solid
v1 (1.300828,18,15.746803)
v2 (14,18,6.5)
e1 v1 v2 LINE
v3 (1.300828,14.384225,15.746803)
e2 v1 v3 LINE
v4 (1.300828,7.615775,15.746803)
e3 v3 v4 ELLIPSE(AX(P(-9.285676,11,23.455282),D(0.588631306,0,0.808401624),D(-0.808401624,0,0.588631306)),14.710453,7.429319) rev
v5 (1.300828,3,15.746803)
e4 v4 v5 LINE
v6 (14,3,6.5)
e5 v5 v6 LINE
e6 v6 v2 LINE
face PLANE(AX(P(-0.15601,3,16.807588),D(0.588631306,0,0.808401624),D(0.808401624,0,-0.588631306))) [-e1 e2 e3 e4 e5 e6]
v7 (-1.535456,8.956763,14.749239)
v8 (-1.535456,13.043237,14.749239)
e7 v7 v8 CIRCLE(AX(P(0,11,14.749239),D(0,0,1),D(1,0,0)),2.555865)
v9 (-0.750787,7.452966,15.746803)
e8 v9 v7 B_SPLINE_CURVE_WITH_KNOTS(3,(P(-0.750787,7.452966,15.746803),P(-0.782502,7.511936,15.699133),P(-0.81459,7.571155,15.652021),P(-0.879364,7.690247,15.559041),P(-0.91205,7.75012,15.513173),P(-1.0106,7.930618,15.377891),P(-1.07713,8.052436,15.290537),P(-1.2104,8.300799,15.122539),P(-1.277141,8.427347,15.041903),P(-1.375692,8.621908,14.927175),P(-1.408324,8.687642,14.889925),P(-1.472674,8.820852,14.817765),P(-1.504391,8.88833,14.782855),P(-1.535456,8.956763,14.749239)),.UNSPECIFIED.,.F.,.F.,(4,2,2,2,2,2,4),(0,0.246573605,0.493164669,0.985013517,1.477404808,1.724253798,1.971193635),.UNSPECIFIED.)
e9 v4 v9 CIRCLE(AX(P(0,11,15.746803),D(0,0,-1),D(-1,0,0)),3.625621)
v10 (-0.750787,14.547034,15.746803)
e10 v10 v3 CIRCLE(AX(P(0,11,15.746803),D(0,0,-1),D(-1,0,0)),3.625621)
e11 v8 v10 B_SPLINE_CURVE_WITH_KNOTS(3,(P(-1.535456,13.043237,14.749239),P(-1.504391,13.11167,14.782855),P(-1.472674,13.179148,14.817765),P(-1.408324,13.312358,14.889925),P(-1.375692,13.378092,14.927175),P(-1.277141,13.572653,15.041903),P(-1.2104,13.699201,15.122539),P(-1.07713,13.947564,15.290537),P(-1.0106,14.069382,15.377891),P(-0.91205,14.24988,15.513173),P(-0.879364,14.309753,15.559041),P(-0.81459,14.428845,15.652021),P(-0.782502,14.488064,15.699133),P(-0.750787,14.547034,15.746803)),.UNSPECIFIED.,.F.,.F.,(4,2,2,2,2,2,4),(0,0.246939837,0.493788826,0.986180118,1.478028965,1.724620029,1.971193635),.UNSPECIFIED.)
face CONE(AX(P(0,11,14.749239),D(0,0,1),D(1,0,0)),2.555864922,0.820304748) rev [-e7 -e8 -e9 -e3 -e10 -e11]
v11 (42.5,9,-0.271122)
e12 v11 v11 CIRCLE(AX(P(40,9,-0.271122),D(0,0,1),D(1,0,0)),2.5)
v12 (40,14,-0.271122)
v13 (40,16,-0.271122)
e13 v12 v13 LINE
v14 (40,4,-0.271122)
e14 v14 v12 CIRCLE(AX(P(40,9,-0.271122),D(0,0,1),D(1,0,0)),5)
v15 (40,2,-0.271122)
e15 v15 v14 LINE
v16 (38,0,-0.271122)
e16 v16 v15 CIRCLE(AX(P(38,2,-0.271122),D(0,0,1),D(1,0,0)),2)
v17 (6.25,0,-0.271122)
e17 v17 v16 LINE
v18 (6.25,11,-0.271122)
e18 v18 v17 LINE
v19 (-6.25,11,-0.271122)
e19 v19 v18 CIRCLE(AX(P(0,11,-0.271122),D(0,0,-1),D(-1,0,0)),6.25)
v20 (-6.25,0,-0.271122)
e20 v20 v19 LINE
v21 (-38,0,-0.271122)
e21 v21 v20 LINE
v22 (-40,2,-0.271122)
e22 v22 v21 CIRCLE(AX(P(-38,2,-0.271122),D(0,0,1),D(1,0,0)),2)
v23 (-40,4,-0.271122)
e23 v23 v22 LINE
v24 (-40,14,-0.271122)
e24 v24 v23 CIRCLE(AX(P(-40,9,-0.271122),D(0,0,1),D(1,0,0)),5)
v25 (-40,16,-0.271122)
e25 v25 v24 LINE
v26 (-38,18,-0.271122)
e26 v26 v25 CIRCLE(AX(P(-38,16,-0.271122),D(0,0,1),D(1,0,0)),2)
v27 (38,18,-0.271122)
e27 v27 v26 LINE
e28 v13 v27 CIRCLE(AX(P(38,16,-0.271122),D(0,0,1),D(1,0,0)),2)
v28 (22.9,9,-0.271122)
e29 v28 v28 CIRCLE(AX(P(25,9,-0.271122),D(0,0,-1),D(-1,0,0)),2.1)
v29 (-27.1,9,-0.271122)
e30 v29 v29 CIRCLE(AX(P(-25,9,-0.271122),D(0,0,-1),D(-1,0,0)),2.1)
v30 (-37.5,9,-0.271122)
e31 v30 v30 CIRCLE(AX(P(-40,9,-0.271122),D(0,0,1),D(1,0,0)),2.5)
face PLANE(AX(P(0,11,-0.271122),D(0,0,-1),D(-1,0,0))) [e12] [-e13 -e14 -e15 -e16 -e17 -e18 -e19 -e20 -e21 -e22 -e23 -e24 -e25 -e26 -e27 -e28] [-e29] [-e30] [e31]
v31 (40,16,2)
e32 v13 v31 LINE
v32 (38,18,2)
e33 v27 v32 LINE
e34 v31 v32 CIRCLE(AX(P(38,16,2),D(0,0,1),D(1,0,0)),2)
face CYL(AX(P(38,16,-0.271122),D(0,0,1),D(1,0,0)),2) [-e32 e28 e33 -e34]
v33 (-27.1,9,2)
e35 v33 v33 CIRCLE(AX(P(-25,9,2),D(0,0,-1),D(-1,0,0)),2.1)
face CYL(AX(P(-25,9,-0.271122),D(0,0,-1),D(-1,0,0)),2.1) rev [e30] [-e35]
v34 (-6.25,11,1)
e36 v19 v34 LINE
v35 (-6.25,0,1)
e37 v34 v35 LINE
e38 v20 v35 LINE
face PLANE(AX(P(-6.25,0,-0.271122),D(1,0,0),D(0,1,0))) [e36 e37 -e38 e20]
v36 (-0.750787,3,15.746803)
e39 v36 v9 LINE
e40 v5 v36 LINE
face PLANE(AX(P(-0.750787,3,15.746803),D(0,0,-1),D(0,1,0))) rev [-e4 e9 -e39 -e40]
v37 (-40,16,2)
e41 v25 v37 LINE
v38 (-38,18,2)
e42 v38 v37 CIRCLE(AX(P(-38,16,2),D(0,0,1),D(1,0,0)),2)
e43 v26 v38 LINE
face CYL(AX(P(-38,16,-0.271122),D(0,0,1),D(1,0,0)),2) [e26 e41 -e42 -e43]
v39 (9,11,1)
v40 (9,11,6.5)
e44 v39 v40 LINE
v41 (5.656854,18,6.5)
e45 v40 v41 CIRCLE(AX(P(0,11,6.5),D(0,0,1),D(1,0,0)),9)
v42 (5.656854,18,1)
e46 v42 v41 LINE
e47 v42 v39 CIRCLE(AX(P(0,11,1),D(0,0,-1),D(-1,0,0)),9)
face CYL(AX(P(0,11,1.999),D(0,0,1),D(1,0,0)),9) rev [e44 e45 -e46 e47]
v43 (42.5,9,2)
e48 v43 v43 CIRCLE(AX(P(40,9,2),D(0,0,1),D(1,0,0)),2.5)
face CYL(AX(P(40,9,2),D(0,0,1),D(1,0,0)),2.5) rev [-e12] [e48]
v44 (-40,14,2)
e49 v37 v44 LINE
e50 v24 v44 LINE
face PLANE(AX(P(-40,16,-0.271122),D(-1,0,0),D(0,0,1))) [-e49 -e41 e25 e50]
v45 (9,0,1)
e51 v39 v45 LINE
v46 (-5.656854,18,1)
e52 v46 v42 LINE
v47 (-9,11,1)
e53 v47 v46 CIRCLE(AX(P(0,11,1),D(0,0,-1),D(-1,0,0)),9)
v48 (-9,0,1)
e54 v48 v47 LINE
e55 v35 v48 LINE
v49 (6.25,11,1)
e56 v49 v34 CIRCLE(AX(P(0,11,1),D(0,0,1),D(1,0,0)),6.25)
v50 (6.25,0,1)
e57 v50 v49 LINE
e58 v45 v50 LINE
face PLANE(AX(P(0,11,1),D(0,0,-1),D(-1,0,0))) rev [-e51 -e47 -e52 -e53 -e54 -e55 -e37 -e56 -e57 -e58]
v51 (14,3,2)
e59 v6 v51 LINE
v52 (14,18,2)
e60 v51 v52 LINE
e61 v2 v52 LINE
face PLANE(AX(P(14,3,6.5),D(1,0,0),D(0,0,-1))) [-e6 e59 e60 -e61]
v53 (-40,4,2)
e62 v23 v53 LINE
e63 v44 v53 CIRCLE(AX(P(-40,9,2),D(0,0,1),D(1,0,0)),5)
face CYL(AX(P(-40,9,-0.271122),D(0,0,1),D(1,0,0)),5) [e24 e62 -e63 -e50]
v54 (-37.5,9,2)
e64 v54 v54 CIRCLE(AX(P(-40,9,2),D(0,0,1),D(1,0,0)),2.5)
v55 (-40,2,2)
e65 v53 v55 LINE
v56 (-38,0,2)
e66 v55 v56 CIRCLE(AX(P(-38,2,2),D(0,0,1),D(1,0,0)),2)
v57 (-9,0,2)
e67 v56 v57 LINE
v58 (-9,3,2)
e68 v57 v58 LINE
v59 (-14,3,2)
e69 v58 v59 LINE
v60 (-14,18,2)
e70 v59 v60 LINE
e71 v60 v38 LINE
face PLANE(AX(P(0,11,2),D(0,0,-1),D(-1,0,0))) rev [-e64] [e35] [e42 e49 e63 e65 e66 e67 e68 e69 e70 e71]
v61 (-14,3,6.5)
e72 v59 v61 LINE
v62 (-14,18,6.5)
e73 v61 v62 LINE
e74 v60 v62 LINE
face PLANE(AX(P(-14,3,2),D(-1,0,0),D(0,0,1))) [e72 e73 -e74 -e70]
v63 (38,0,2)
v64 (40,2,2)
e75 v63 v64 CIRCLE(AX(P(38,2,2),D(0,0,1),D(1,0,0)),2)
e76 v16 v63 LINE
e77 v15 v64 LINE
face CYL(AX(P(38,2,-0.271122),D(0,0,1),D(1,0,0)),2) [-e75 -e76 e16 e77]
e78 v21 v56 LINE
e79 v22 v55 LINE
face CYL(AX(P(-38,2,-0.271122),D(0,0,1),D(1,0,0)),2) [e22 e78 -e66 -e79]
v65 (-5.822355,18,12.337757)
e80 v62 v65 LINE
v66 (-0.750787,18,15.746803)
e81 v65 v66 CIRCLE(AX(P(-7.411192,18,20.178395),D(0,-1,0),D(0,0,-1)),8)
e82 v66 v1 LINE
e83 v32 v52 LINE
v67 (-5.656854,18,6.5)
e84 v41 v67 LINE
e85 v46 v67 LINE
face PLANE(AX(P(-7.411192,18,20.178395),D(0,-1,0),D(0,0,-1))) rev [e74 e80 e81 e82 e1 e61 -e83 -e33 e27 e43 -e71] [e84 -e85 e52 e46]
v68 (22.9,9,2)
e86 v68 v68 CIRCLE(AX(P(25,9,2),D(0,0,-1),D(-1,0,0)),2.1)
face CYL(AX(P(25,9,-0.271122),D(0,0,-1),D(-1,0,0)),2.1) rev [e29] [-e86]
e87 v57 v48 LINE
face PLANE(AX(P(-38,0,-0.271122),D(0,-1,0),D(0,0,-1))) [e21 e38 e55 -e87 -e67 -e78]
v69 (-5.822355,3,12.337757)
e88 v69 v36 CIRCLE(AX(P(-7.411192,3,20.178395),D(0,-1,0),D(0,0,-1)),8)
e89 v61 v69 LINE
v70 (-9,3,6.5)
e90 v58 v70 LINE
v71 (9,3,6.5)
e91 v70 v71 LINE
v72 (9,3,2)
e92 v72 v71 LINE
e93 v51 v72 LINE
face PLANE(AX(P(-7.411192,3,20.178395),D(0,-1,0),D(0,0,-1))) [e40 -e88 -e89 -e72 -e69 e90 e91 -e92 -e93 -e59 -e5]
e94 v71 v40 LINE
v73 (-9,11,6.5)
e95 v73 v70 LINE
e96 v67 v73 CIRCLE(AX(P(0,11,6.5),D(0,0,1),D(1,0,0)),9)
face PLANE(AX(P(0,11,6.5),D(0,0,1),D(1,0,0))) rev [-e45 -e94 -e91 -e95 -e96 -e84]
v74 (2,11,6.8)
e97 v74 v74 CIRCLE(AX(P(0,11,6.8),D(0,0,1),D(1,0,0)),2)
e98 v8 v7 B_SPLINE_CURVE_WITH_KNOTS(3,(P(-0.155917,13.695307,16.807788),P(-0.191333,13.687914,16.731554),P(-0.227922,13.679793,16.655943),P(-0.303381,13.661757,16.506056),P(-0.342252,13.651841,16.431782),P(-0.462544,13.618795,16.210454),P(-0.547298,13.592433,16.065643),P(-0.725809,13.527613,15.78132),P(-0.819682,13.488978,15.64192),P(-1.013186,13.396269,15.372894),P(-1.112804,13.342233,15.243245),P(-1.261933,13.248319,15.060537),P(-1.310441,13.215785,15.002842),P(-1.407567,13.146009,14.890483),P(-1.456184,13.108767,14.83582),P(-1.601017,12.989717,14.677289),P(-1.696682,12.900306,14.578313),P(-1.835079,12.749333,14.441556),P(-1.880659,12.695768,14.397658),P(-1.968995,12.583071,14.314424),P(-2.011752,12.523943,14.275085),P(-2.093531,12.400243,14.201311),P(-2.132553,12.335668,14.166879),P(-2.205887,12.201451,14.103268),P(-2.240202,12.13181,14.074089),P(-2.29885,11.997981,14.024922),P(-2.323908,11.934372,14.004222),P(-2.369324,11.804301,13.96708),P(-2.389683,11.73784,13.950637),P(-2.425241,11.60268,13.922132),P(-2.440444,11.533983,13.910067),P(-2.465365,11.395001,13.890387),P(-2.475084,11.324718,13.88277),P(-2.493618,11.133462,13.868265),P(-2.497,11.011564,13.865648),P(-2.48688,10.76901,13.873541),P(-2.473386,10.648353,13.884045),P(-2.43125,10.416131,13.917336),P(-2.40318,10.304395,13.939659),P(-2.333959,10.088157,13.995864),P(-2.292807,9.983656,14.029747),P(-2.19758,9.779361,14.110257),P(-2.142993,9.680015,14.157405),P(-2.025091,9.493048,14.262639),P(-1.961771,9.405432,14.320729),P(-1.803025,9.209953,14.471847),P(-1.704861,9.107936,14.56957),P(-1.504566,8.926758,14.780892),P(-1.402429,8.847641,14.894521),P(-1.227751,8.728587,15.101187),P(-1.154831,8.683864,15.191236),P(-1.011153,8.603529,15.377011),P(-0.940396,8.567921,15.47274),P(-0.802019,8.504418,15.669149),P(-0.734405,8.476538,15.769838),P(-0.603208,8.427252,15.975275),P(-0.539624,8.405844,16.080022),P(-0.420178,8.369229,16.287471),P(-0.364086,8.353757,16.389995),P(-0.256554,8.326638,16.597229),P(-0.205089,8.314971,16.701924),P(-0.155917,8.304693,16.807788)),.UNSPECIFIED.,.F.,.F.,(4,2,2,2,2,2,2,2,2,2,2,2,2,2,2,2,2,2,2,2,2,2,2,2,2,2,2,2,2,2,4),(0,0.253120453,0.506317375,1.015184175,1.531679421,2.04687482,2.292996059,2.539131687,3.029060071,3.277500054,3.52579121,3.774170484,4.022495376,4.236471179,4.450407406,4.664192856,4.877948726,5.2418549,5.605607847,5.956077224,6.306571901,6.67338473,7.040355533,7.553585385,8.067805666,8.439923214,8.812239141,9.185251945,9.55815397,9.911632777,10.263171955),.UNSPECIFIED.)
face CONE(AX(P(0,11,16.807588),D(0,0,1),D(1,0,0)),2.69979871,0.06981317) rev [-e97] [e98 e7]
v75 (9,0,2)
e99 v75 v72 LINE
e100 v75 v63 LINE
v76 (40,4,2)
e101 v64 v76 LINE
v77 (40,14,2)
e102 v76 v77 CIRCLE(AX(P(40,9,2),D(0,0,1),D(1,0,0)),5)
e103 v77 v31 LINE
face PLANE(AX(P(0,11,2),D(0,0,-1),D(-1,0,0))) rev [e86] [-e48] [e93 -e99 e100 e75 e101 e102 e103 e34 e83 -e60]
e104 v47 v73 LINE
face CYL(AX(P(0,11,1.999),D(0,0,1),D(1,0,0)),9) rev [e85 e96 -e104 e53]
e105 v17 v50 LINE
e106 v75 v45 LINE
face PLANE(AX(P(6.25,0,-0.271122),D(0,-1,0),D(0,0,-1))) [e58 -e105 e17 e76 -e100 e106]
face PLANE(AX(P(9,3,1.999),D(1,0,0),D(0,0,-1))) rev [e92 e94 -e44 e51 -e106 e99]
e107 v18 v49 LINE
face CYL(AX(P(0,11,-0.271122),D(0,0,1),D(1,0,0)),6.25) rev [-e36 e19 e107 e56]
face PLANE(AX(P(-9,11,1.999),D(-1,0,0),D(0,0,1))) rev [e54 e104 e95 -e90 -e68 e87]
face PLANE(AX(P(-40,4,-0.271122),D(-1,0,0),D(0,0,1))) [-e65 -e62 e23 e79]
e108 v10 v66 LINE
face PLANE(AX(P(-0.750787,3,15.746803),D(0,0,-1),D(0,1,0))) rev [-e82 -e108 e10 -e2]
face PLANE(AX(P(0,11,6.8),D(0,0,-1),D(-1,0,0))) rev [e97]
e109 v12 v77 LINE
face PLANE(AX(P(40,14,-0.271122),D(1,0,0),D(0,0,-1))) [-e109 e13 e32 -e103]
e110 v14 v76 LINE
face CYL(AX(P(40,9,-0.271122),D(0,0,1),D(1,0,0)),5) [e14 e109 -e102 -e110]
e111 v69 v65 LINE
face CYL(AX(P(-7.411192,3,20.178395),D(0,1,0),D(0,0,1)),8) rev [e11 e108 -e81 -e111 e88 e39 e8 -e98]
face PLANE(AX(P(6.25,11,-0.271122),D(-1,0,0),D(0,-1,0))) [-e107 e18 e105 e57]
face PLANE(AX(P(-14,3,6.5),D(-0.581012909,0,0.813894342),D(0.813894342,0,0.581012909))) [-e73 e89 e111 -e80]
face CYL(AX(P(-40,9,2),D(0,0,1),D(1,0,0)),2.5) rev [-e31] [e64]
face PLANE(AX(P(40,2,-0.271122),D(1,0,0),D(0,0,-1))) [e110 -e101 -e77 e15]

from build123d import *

# Parameters (mm, degrees)
BOSS_EXTRUDE1_DEPTH            = 15
CHAMFER1_SIZE                  = 1.802121321
CHAMFER2_SIZE                  = 1.802121321
CUT_EXTRUDE1_REACH             = 26.607
BOSS_EXTRUDE2_DEPTH            = 2.271122456
CUT_EXTRUDE2_REACH             = 52.66
F_4_2_4_2_DIAMETER_HOLE1_D     = 4.2
F_4_2_4_2_DIAMETER_HOLE1_DEPTH = 16.017925233
F_4_2_4_2_DIAMETER_HOLE2_D     = 4.2
F_4_2_4_2_DIAMETER_HOLE2_DEPTH = 16.017925233
F_5_0_5_DIAMETER_HOLE1_D       = 5
F_5_0_5_DIAMETER_HOLE2_D       = 5


with BuildPart() as part:
    # Sketch1 → Boss-Extrude1 (new body)
    with BuildSketch(Plane(origin=(0, 18, 0), x_dir=(1, 0, 0), z_dir=(0, 1, 0))):
        with BuildLine():
            Line((14, -6.5), (14, -2))
            Line((14, -2), (-14, -2))
            Line((-14, -2), (-14, -6.5))
            Line((-14, -6.5), (-5.822354851, -12.337757006))
            ThreePointArc((-5.822354851, -12.337757006), (-2.456495727, -13.897392525), (-0.156010119, -16.807587804))
            Line((-0.156010119, -16.807587804), (14, -6.5))
        make_face()
    extrude(amount=-BOSS_EXTRUDE1_DEPTH)

    # Sketch2 → Hole1 (revolve, cut)
    with BuildSketch(Plane(origin=(0, 11, 16.807587804), x_dir=(0, -1, 0), z_dir=(1, 0, 0))):
        Polygon((0, 0), (0, 10.007587804), (2, 10.007587804), (2.69979871, 0), align=None)
    revolve(axis=Axis((0, 11, -93.192412196), (0, 0, 1)), mode=Mode.SUBTRACT)

    # Chamfer1
    # the kernel refuses this chamfer: 1.802121321, 1.16968541 mm, written as the material it takes off along each edge
    with BuildSketch(Plane(origin=(-0.156010119, 12.956909278, 16.807587804), x_dir=(0.8084016240923299, 0, -0.5886313057975113), z_dir=(0, -1, 0))) as chamfer1_piece_1:
        with BuildLine():
            Line((CHAMFER1_SIZE, 0), (0.14359278, -1.207644556))
            ThreePointArc((0.14359278, -1.207644556), (0.096853733, -0.618716026), (0, 0))
            Line((0, 0), (CHAMFER1_SIZE, 0))
        make_face()
    extrude(amount=14.60910591, mode=Mode.SUBTRACT)

    # Chamfer2
    # the kernel refuses this chamfer: 1.802121321, 1.16968541 mm, written as the material it takes off along each edge
    with BuildSketch(Plane(origin=(-0.156010119, 22.652196632, 16.807587804), x_dir=(0.8084016240923299, 0, -0.5886313057975113), z_dir=(0, -1, 0))) as chamfer2_piece_1:
        with BuildLine():
            Line((CHAMFER2_SIZE, 0), (0.14359278, -1.207644556))
            ThreePointArc((0.14359278, -1.207644556), (0.096853733, -0.618716026), (0, 0))
            Line((0, 0), (CHAMFER2_SIZE, 0))
        make_face()
    extrude(amount=13.60910591, mode=Mode.SUBTRACT)

    # Chamfer3: read off the stored shape, not the designer's step
    # Chamfer3 outline → Chamfer3 (revolve, cut)
    with BuildSketch(Plane.XZ.offset(-11)):
        Polygon((2.555864922, 15.746802777), (2.555864922, 14.749238727), (3.625621395, 15.746802777), align=None)
    revolve(axis=Axis((0, 11, 0), (0, 0, 1)), mode=Mode.SUBTRACT)

    # Sketch4 → Cut-Extrude1 (cut, up to next)
    with BuildSketch(Plane.XY.offset(6.5), mode=Mode.PRIVATE) as cut_extrude1_sk1:
        with BuildLine():
            Line((9, 3), (9, 11))
            ThreePointArc((9, 11), (8.121320344, 14.878679656), (5.656854249, 18))
            Line((5.656854249, 18), (-5.656854249, 18))
            ThreePointArc((-5.656854249, 18), (-8.121320344, 14.878679656), (-9, 11))
            Line((-9, 11), (-9, 3))
            Line((-9, 3), (9, 3))
        make_face()
    cut_extrude1_tool1 = extrude(cut_extrude1_sk1.sketch, amount=-CUT_EXTRUDE1_REACH, mode=Mode.PRIVATE) & part.part
    add(cut_extrude1_tool1.solids().sort_by_distance((0, 10.176322, 6.5))[0], mode=Mode.SUBTRACT)

    # Sketch5 → Boss-Extrude2 (add)
    with BuildSketch(Plane.XY.offset(2)):
        with BuildLine():
            Line((-6.25, 0), (-6.25, 11))
            ThreePointArc((-6.25, 11), (0, 17.25), (6.25, 11))
            Line((6.25, 11), (6.25, 0))
            Line((6.25, 0), (38, 0))
            ThreePointArc((38, 0), (39.414213562, 0.585786438), (40, 2))
            Line((40, 2), (40, 4))
            ThreePointArc((40, 4), (45, 9), (40, 14))
            Line((40, 14), (40, 16))
            ThreePointArc((40, 16), (39.414213562, 17.414213562), (38, 18))
            Line((38, 18), (-38, 18))
            ThreePointArc((-38, 18), (-39.414213562, 17.414213562), (-40, 16))
            Line((-40, 16), (-40, 14))
            ThreePointArc((-40, 14), (-45, 9), (-40, 4))
            Line((-40, 4), (-40, 2))
            ThreePointArc((-40, 2), (-39.414213562, 0.585786438), (-38, 0))
            Line((-38, 0), (-6.25, 0))
        make_face()
    extrude(amount=-BOSS_EXTRUDE2_DEPTH)

    # Sketch6 → Cut-Extrude2 (cut, up to next)
    with BuildSketch(Plane(origin=(0, 0, 1), x_dir=(-1, 0, 0), z_dir=(0, 0, -1)), mode=Mode.PRIVATE) as cut_extrude2_sk1:
        with BuildLine():
            Line((-9, 11), (-9, 0))
            Line((-9, 0), (-6.25, 0))
            Line((-6.25, 0), (-6.25, 11))
            ThreePointArc((-6.25, 11), (0, 17.25), (6.25, 11))
            Line((6.25, 11), (6.25, 0))
            Line((6.25, 0), (9, 0))
            Line((9, 0), (9, 11))
            ThreePointArc((9, 11), (8.121320344, 14.878679656), (5.656854249, 18))
            Line((5.656854249, 18), (-5.656854249, 18))
            ThreePointArc((-5.656854249, 18), (-8.121320344, 14.878679656), (-9, 11))
        make_face()
    cut_extrude2_tool1 = extrude(cut_extrude2_sk1.sketch, amount=-CUT_EXTRUDE2_REACH, mode=Mode.PRIVATE) & part.part
    add(cut_extrude2_tool1.solids().sort_by_distance((7.891615, 14.768974, 1))[0], mode=Mode.SUBTRACT)

    # Ø4.2 (4.2) Diameter Hole1
    with Locations(Plane(origin=(0, 0, -0.271122456), x_dir=(-1, 0, 0), z_dir=(0, 0, -1))):
        with Locations((25, 9)):
            Hole(F_4_2_4_2_DIAMETER_HOLE1_D / 2, depth=F_4_2_4_2_DIAMETER_HOLE1_DEPTH)

    # Ø4.2 (4.2) Diameter Hole2
    with Locations(Plane(origin=(0, 0, -0.271122456), x_dir=(-1, 0, 0), z_dir=(0, 0, -1))):
        with Locations((-25, 9)):
            Hole(F_4_2_4_2_DIAMETER_HOLE2_D / 2, depth=F_4_2_4_2_DIAMETER_HOLE2_DEPTH)

    # Ø5.0 (5) Diameter Hole1 (through all)
    with Locations(Plane.XY.offset(2)):
        with Locations((40, 9)):
            Hole(F_5_0_5_DIAMETER_HOLE1_D / 2)

    # Ø5.0 (5) Diameter Hole2 (through all)
    with Locations(Plane.XY.offset(2)):
        with Locations((-40, 9)):
            Hole(F_5_0_5_DIAMETER_HOLE2_D / 2)


solid = part.part
